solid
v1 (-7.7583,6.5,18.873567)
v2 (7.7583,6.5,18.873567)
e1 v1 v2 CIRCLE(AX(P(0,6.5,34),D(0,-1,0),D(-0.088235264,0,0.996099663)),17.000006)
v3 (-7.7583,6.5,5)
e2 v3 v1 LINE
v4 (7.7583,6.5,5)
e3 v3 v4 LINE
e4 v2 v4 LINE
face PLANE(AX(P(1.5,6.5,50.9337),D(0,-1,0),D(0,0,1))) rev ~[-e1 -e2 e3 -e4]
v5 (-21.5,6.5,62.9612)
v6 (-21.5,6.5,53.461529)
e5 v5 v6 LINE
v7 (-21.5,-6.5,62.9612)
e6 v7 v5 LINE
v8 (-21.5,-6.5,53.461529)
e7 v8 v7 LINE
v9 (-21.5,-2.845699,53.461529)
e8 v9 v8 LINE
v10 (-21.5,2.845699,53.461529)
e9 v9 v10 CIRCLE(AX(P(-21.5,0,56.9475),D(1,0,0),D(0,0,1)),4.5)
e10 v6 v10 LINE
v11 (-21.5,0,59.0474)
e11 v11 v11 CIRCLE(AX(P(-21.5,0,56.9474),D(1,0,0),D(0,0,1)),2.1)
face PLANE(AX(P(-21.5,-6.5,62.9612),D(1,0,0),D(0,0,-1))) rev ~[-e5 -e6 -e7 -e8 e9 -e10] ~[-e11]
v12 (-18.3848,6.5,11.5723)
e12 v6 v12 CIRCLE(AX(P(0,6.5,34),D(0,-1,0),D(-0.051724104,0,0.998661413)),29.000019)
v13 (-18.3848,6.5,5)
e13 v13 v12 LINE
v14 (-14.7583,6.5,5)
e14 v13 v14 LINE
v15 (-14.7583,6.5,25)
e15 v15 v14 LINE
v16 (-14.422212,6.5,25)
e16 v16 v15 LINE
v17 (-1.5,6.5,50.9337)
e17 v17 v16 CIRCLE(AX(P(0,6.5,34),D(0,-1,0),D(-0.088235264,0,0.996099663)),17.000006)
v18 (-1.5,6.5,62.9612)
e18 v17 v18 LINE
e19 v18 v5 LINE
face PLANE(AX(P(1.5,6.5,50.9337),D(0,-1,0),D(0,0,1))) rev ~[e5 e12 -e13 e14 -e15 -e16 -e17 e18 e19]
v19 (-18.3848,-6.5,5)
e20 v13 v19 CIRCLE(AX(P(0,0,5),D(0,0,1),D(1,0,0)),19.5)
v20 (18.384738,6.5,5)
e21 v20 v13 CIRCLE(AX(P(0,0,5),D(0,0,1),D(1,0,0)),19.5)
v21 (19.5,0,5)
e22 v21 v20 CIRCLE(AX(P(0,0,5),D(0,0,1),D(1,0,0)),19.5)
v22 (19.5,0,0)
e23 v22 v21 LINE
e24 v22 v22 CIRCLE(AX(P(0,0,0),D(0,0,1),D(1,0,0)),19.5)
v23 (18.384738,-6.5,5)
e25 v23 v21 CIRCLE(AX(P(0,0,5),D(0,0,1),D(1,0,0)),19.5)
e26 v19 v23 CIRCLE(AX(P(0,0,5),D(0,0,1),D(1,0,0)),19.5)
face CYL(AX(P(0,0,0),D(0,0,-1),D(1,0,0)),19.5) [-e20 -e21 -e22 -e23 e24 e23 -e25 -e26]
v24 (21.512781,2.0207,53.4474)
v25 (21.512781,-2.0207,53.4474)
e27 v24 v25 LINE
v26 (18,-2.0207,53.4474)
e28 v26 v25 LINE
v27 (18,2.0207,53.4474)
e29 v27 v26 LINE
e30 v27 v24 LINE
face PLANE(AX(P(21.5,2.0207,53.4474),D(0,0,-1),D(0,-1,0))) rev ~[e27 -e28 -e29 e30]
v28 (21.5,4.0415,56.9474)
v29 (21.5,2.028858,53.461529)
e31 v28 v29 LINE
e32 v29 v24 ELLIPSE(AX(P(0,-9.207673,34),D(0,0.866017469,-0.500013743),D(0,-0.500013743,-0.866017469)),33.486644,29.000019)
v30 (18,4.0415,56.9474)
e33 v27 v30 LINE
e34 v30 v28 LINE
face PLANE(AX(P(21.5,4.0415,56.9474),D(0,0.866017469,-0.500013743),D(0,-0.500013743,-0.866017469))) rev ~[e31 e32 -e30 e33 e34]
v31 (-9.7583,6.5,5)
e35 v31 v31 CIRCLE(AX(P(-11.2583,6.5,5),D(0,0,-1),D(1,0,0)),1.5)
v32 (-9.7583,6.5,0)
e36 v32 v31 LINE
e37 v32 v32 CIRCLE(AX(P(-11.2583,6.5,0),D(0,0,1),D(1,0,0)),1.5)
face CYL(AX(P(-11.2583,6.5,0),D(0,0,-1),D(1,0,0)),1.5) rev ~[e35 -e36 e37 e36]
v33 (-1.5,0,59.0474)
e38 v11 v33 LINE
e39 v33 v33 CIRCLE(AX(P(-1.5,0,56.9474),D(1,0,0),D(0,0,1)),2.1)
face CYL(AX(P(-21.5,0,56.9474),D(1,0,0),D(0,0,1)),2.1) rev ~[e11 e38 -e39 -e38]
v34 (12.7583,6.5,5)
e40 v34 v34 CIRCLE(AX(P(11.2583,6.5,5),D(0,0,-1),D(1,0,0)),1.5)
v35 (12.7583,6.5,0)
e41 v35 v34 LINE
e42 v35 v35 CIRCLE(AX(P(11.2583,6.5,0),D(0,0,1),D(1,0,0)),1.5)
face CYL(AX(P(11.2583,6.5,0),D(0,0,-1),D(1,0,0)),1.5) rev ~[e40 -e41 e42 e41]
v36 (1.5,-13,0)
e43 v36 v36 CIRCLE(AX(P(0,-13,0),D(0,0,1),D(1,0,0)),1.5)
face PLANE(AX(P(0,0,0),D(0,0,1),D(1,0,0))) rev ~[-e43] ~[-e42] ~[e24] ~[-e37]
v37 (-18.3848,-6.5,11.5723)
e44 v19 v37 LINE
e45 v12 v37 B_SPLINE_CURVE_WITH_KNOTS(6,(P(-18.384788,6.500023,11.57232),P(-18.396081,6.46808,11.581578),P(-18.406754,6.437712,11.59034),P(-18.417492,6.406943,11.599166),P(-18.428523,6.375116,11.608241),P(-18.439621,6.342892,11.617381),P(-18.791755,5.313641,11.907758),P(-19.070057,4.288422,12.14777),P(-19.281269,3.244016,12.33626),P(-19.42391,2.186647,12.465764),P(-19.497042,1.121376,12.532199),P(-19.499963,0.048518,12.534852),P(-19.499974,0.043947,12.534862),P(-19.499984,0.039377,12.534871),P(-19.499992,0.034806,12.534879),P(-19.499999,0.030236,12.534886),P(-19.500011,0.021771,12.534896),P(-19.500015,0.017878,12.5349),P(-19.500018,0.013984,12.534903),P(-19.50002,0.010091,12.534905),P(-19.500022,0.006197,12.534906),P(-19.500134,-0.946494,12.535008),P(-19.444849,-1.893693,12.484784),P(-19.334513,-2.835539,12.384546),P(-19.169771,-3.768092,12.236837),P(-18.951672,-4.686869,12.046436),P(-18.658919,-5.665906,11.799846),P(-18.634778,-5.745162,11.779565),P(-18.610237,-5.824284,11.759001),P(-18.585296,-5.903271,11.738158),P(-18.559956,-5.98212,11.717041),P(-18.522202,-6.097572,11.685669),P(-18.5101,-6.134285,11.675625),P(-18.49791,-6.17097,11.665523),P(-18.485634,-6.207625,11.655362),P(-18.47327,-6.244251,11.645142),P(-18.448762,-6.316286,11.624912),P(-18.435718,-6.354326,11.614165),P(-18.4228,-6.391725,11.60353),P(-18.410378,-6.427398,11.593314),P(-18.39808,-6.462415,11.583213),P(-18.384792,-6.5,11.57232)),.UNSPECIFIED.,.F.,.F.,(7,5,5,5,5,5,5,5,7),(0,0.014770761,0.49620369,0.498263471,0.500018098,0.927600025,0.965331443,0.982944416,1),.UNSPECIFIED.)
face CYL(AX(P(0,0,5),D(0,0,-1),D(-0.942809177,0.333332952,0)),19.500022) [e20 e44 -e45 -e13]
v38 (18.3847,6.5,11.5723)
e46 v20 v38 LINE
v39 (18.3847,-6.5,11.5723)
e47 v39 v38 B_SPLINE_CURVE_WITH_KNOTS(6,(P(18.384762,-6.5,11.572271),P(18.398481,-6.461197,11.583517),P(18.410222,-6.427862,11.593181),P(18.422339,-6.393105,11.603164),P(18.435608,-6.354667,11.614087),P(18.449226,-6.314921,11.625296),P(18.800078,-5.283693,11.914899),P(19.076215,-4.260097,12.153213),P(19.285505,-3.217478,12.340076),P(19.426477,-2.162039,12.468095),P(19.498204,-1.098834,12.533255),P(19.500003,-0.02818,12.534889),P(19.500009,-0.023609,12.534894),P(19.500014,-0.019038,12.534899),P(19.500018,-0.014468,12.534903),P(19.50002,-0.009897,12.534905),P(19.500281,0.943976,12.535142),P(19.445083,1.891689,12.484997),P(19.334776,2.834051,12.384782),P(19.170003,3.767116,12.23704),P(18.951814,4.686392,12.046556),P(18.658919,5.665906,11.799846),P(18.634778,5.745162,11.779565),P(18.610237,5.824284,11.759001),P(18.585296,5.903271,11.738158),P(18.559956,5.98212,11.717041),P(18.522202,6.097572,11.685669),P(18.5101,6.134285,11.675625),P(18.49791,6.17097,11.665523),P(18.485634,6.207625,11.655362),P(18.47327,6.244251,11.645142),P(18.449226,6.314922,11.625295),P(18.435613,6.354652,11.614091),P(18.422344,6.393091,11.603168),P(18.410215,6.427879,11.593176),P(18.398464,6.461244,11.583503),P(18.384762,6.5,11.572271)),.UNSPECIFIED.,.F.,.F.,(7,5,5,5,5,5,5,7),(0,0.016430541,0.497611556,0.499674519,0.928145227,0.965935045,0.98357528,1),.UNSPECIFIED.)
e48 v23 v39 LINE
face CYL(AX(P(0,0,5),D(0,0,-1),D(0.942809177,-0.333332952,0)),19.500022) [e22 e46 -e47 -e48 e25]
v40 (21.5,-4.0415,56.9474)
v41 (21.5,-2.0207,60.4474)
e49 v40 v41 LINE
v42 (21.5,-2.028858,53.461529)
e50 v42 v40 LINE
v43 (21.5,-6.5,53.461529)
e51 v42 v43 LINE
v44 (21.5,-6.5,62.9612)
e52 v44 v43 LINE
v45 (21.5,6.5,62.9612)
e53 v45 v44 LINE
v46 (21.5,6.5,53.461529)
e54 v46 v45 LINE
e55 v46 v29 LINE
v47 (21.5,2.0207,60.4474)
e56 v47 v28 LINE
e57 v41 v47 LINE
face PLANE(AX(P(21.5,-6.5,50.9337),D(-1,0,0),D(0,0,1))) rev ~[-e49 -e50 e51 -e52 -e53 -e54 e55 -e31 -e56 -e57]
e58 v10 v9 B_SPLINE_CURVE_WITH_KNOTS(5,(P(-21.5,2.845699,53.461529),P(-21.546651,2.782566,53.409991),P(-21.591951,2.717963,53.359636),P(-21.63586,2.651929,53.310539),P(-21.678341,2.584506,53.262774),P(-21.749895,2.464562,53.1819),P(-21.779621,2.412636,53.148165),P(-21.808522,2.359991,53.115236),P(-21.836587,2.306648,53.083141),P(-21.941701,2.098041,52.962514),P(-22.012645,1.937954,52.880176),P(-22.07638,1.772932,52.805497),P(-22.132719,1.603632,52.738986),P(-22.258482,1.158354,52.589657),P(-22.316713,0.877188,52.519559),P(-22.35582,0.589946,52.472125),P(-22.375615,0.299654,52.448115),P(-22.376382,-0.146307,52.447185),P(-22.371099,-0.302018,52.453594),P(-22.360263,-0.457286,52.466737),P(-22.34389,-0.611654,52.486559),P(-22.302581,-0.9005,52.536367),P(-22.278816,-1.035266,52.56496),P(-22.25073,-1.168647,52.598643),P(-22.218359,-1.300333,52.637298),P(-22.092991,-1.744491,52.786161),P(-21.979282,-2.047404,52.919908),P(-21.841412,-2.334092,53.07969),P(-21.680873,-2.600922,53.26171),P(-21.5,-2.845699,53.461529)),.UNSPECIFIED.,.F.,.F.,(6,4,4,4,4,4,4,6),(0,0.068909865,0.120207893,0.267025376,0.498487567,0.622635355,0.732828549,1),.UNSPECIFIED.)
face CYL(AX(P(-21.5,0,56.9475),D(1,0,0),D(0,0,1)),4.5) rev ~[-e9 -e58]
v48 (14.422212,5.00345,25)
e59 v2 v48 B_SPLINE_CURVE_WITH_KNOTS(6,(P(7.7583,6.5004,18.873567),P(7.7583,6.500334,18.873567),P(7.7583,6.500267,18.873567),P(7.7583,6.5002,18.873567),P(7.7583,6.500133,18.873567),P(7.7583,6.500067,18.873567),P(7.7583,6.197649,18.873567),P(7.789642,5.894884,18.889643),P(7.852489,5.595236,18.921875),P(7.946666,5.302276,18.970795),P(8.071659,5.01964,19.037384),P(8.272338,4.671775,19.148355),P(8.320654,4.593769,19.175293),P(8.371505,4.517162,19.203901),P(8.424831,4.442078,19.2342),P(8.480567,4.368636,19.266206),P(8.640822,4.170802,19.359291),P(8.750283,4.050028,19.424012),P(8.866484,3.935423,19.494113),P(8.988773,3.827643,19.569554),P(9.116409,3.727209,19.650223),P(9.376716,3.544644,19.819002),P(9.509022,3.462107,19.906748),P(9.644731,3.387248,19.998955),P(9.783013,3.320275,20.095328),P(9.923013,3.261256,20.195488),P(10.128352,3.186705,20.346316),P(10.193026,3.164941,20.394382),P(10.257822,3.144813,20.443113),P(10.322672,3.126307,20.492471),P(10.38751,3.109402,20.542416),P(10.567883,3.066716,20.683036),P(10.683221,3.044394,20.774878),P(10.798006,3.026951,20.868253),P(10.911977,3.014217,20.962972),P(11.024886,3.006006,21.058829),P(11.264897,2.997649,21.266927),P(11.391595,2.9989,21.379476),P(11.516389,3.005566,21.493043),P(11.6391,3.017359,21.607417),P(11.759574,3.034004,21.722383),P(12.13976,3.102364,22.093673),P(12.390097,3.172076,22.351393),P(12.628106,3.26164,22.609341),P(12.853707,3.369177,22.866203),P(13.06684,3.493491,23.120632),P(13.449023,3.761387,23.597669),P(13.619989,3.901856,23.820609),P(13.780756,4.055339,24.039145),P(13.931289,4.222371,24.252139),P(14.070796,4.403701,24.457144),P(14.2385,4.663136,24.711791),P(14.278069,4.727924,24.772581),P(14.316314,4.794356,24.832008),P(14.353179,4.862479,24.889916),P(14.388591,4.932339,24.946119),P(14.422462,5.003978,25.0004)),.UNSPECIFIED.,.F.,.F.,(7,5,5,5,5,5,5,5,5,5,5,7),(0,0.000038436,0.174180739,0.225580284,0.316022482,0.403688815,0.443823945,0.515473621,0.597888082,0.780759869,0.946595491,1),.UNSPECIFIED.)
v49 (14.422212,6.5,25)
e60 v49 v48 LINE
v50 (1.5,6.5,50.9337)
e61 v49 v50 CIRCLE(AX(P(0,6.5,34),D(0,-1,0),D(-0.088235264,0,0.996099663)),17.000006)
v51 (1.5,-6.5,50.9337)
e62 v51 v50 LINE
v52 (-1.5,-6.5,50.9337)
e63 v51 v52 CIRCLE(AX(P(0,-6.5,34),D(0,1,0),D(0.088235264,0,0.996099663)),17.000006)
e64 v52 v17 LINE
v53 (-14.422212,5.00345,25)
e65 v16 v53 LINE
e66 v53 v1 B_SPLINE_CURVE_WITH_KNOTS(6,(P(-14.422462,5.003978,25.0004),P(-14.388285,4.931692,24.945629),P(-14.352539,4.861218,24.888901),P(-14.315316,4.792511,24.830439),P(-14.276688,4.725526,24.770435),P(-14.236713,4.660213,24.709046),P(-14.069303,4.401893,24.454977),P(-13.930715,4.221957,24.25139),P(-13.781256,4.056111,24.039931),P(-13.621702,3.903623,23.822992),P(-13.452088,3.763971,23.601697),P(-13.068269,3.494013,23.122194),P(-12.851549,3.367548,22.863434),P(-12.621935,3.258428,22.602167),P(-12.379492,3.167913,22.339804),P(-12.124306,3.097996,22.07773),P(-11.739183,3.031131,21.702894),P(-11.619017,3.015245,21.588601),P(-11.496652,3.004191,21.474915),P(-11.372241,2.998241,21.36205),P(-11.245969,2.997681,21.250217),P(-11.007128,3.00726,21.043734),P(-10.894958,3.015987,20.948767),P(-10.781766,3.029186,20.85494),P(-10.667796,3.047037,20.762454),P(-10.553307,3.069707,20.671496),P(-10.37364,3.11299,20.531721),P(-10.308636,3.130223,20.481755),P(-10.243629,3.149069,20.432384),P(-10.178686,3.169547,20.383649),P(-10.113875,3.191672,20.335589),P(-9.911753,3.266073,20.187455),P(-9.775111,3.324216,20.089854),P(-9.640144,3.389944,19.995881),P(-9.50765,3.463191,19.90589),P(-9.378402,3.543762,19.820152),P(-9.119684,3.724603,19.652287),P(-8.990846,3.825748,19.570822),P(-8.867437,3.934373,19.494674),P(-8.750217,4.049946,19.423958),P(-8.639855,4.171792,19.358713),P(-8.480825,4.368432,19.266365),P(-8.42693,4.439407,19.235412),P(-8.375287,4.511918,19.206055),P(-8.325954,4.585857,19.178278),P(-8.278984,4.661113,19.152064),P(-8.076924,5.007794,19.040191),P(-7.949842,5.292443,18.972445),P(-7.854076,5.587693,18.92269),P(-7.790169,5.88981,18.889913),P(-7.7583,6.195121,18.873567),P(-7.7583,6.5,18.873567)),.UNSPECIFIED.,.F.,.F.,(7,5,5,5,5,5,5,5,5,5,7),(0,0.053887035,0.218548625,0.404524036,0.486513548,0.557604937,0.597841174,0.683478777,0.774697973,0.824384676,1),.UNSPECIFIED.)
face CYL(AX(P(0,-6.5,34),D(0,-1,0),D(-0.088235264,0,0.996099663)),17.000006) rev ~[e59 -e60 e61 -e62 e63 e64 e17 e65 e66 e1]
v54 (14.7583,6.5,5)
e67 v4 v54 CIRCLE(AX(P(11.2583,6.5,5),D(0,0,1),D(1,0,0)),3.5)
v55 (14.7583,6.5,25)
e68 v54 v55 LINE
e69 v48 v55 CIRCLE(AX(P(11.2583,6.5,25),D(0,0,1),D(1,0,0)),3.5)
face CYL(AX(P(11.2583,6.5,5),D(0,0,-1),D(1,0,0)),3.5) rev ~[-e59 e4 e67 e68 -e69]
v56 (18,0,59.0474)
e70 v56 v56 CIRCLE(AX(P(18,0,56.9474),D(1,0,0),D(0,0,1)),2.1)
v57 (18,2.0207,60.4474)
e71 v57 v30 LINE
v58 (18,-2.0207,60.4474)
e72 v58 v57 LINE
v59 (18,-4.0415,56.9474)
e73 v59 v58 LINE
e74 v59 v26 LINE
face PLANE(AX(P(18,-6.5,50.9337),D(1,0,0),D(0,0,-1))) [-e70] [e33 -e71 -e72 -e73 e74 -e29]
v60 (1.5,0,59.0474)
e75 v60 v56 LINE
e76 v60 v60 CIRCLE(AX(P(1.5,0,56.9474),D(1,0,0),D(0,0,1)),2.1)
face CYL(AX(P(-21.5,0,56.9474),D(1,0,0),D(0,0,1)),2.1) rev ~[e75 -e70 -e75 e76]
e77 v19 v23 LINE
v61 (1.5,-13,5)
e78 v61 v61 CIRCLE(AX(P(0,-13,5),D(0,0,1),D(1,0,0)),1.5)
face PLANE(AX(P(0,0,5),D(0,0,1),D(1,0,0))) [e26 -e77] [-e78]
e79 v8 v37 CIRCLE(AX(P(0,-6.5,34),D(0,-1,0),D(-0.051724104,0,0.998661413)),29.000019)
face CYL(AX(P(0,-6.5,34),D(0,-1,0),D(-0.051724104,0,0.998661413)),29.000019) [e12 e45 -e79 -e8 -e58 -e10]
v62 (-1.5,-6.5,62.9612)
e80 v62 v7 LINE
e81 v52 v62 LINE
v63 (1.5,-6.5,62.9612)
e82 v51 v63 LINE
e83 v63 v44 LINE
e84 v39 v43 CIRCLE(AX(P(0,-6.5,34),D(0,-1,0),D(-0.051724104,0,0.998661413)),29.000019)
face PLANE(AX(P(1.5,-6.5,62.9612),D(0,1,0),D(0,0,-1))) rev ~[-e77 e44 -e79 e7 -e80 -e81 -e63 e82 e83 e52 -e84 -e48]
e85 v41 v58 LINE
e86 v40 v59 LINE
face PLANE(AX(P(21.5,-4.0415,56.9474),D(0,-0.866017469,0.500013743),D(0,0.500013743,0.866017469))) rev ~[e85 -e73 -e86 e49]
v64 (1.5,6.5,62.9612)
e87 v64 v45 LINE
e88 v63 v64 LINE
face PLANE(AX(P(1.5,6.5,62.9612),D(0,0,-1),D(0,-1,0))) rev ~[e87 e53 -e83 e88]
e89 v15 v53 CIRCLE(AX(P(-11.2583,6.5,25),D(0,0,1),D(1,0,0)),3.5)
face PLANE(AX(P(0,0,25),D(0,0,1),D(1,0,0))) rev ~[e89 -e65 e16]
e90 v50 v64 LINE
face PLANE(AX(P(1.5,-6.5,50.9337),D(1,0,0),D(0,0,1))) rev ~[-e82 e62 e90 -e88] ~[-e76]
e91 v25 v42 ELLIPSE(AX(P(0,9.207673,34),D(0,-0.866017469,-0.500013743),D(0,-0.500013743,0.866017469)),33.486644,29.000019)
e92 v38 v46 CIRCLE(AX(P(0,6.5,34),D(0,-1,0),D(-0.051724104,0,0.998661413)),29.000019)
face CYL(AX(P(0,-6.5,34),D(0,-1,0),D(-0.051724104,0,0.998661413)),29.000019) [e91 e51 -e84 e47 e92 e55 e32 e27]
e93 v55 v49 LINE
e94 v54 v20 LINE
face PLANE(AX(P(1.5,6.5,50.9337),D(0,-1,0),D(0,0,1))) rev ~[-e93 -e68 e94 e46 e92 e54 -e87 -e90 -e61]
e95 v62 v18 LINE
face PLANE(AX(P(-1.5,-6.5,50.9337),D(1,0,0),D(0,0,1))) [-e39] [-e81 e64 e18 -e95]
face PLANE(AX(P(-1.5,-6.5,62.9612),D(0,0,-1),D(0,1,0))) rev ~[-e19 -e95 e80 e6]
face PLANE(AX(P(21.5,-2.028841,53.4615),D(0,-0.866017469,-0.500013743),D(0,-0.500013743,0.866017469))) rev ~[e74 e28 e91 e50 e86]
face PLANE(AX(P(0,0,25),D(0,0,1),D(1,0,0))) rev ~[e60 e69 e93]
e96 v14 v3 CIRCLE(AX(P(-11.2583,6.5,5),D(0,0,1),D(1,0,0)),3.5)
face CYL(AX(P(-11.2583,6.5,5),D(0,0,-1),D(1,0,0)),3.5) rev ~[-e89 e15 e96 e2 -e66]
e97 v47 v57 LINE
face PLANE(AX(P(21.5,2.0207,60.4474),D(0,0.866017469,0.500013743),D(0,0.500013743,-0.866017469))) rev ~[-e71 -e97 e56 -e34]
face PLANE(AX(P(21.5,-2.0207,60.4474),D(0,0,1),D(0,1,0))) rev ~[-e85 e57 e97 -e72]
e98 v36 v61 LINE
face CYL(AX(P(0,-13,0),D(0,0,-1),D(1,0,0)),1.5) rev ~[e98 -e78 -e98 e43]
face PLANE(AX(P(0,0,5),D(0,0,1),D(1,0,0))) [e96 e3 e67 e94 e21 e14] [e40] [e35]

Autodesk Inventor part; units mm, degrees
ref_plane "YZ Plane" through (0, 0, 0) normal (1, 0, 0) x (0, 1, 0)
ref_plane "XZ Plane" through (0, 0, 0) normal (0, 1, 0) x (-1, 0, 0)
ref_plane "XY Plane" through (0, 0, 0) normal (0, 0, 1) x (1, 0, 0)
sketch "Skizze1" plane through (0, 0, 0) normal (0, 0, 1) x (1, 0, 0)
  circle A0 centre (-11.2583, 6.5) radius 1.5 projected
  circle A1 centre (-11.2583, -6.5) radius 1.5 projected
  circle A2 centre (0, -13) radius 1.5 projected
  circle A3 centre (11.2583, -6.5) radius 1.5 projected
  circle A4 centre (11.2583, 6.5) radius 1.5 projected
  circle A5 centre (0, 13) radius 1.5 projected
  arc A6 (14.3761, 1.8914) -> (11.9393, 3.5783) centre (12.3932, 1.6305) ccw projected
  arc A7 (14.3761, -1.8914) -> (14.3761, 1.8914) centre (0, 0) ccw projected
  arc A8 (11.9393, -3.5783) -> (14.3761, -1.8914) centre (12.3932, -1.6305) ccw projected
  arc A9 (11.9393, -3.5783) -> (9.0685, -8.5505) centre (11.2583, -6.5) ccw projected
  arc A10 (8.826, -11.5044) -> (9.0685, -8.5505) centre (7.6087, -9.9176) ccw projected
  arc A11 (5.5501, -13.3958) -> (8.826, -11.5044) centre (0, 0) ccw projected
  arc A12 (2.8707, -12.1288) -> (5.5501, -13.3958) centre (4.7846, -11.5481) ccw projected
  arc A13 (2.8707, -12.1288) -> (-2.8707, -12.1288) centre (0, -13) ccw projected
  arc A14 (-5.5501, -13.3958) -> (-2.8707, -12.1288) centre (-4.7846, -11.5481) ccw projected
  arc A15 (-8.826, -11.5044) -> (-5.5501, -13.3958) centre (0, 0) ccw projected
  arc A16 (-9.0685, -8.5505) -> (-8.826, -11.5044) centre (-7.6087, -9.9176) ccw projected
  arc A17 (-9.0685, -8.5505) -> (-11.9393, -3.5783) centre (-11.2583, -6.5) ccw projected
  arc A18 (-14.3761, -1.8914) -> (-11.9393, -3.5783) centre (-12.3932, -1.6305) ccw projected
  arc A19 (-14.3761, 1.8914) -> (-14.3761, -1.8914) centre (0, 0) ccw projected
  arc A20 (-11.9393, 3.5783) -> (-14.3761, 1.8914) centre (-12.3932, 1.6305) ccw projected
  arc A21 (-11.9393, 3.5783) -> (-9.0685, 8.5505) centre (-11.2583, 6.5) ccw projected
  arc A22 (-8.826, 11.5044) -> (-9.0685, 8.5505) centre (-7.6087, 9.9176) ccw projected
  arc A23 (-5.5501, 13.3958) -> (-8.826, 11.5044) centre (0, 0) ccw projected
  arc A24 (-2.8707, 12.1288) -> (-5.5501, 13.3958) centre (-4.7846, 11.5481) ccw projected
  arc A25 (-2.8707, 12.1288) -> (2.8707, 12.1288) centre (0, 13) ccw projected
  arc A26 (5.5501, 13.3958) -> (2.8707, 12.1288) centre (4.7846, 11.5481) ccw projected
  arc A27 (8.826, 11.5044) -> (5.5501, 13.3958) centre (0, 0) ccw projected
  arc A28 (9.0685, 8.5505) -> (8.826, 11.5044) centre (7.6087, 9.9176) ccw projected
  arc A29 (9.0685, 8.5505) -> (11.9393, 3.5783) centre (11.2583, 6.5) ccw projected
  circle A30 centre (0, 0) radius 17.5 projected
  circle A31 centre (0, 0) radius 19.5
  point P0 (0, 0)
  dimension "d0" = 39
extrude "Extrusion1" add sketch "Skizze1" along normal blind 5 contours A7 A8 A9 A10 A11 A12 A13 A14 A15 A16 A17 A18 A19 A20 A21 A22 A23 A24 A25 A26 A27 A28 A29 A6 | A30 | A31
ref_plane "Arbeitsebene1" through (11.2583, -6.5, 0) normal (0, -1, 0) x (0, 0, 1)
sketch "Skizze7" plane through (11.2583, -6.5, 0) normal (0, -1, 0) x (0, 0, 1)
  line L0 (0, 21.0167) -> (5, 21.0167) projected
  line L1 (5, 21.0167) -> (5, 1.5) projected
  line L2 (5, 1.5) -> (0, 1.5) projected
  line L3 (0, 1.5) -> (0, 21.0167) projected
  line L4 (5, -7.1264) -> (0, -7.1264) projected
  line L5 (0, -7.1264) -> (0, -1.5) projected
  line L6 (0, -1.5) -> (5, -1.5) projected
  line L7 (5, -1.5) -> (5, -7.1264) projected
  line L8 (0, 29.6431) -> (5, 29.6431) projected
  line L9 (5, 29.6431) -> (5, 24.0167) projected
  line L10 (5, 24.0167) -> (0, 24.0167) projected
  line L11 (0, 24.0167) -> (0, 29.6431) projected
  line L12 (5, 1.5) -> (17, 1.5)
  line L13 (17, 1.5) -> (17, 21.0167)
  line L14 (17, 21.0167) -> (5, 21.0167)
  line L15 (5, 21.0167) -> (5, 1.5)
  arc A0 (50.9337, 12.7583) -> (50.9337, 9.7583) centre (34, 11.2583) ccw
  arc A1 (62.9612, 12.7583) -> (62.9612, 9.7583) centre (34, 11.2583) ccw
  line L16 (50.9337, 9.7583) -> (62.9612, 9.7583)
  line L17 (50.9337, 12.7583) -> (62.9612, 12.7583)
  line L18 (34, 11.2583) -> (5, 11.2583) construction
  line L19 (5, -7.1264) -> (11.5723, -7.1264)
  line L20 (5, 29.6431) -> (11.5723, 29.6431)
  line L21 (5, -7.1264) -> (5, 29.6431)
  point P0 (0, 11.2583)
  dimension "d26" = 3
  dimension "d27" = 17
  dimension "d28" = 12
extrude "Extrusion6" add sketch "Skizze7" against normal blind 13 contours L14 A1 L1 | L21 L9 L20 A1 L14 | A1 L12 L1 | A1 L14 L13 L12 | A1 L17 A0 L13 L14 | L12 A1 L19 L7 L21 | L12 L13 A0 L16 A1
sketch "Skizze8" plane through (1.5, -6.5, 50.9337) normal (-1, 0, 0) x (0, 0, 1)
  line L0 (12.0275, 0) -> (0, 0) projected
  line L1 (0, 0) -> (0, 13) projected
  line L2 (0, 13) -> (12.0275, 13) projected
  line L3 (12.0275, 13) -> (12.0275, 0) projected
  line L4 (-45.9337, 25.9422) -> (-45.9337, 19.5) projected
  line L5 (-45.9337, 19.5) -> (-45.9337, 13) projected
  line L6 (-45.9337, 13) -> (-33.8674, 13) projected
  line L7 (-33.8674, 13) -> (-33.8674, 0) projected
  line L8 (-33.8674, 0) -> (-45.9337, 0) projected
  line L9 (-45.9337, 0) -> (-45.9337, -6.5) projected
  line L10 (-45.9337, -6.5) -> (-50.9337, -6.5) projected
  line L11 (-50.9337, -6.5) -> (-50.9337, 19.5) projected
  line L12 (-50.9337, 19.5) -> (-50.9337, 25.9422) projected
  line L13 (-50.9337, 25.9422) -> (-45.9337, 25.9422) projected
  line L14 (-45.9337, 19.5) -> (-50.9337, 19.5) projected
  line L15 (-45.9337, -6.5) -> (-45.9337, -12.9422) projected
  line L16 (-45.9337, -12.9422) -> (-50.9337, -12.9422) projected
  line L17 (-50.9337, -12.9422) -> (-50.9337, -6.5) projected
  point P0 (-50.9337, 6.5)
extrude "Extrusion7" add sketch "Skizze8" against normal blind 20 contours L0 L1 L2 L3
sketch "Skizze9" plane through (-1.5, -6.5, 62.9612) normal (1, 0, 0) x (0, 0, -1)
  line L0 (12.0275, 0) -> (0, 0) projected
  line L1 (0, 0) -> (0, 13) projected
  line L2 (0, 13) -> (12.0275, 13) projected
  line L3 (12.0275, 13) -> (12.0275, 0) projected
  line L4 (57.9612, -12.9422) -> (57.9612, -6.5) projected
  line L5 (57.9612, -6.5) -> (57.9612, 0) projected
  line L6 (57.9612, 0) -> (45.8949, 0) projected
  line L7 (45.8949, 0) -> (45.8949, 13) projected
  line L8 (45.8949, 13) -> (57.9612, 13) projected
  line L9 (57.9612, 13) -> (57.9612, 19.5) projected
  line L10 (57.9612, 19.5) -> (62.9612, 19.5) projected
  line L11 (62.9612, 19.5) -> (62.9612, -6.5) projected
  line L12 (62.9612, -6.5) -> (62.9612, -12.9422) projected
  line L13 (62.9612, -12.9422) -> (57.9612, -12.9422) projected
  line L14 (57.9612, -6.5) -> (62.9612, -6.5) projected
  line L15 (57.9612, 19.5) -> (57.9612, 25.9422) projected
  line L16 (57.9612, 25.9422) -> (62.9612, 25.9422) projected
  line L17 (62.9612, 25.9422) -> (62.9612, 19.5) projected
  point P0 (62.9612, 6.5)
extrude "Extrusion8" add sketch "Skizze9" against normal blind 20 contours L0 L1 L2 L3
sketch "Skizze10" plane through (0, 0, 5) normal (0, 0, 1) x (1, 0, 0)
  circle A0 centre (0, 13) radius 1.5 projected
  circle A1 centre (11.2583, 6.5) radius 1.5 projected
  circle A2 centre (11.2583, -6.5) radius 1.5 projected
  circle A3 centre (0, -13) radius 1.5 projected
  circle A4 centre (-11.2583, -6.5) radius 1.5 projected
  circle A5 centre (-11.2583, 6.5) radius 1.5 projected
  circle A6 centre (0, 0) radius 19.5 projected
  circle A7 centre (11.2583, 6.5) radius 3.5
  circle A8 centre (-11.2583, 6.5) radius 3.5
  line L0 (12.7583, 6.5) -> (9.7583, 6.5) projected
  point P0 (0, 0)
  dimension "d35" = 7
extrude "Extrusion9" cut sketch "Skizze10" along normal blind 20 contours L0 A1 | A1 L0 | A5 | A7 | A8
sketch "Skizze11" plane through (0, 0, 0) normal (0, 0, -1) x (-1, 0, 0)
  circle A0 centre (0, 13) radius 1.5 projected
  circle A1 centre (-11.2583, 6.5) radius 1.5 projected
  circle A2 centre (-11.2583, -6.5) radius 1.5 projected
  circle A3 centre (0, -13) radius 1.5 projected
  circle A4 centre (11.2583, -6.5) radius 1.5 projected
  circle A5 centre (11.2583, 6.5) radius 1.5 projected
  circle A6 centre (0, 0) radius 19.5 projected
  point P0 (0, 0)
extrude "Extrusion10" add sketch "Skizze11" against normal up to surface (5 mm away) contours A0 | A2 | A4
sketch "Skizze13" plane through (-21.5, -6.5, 62.9612) normal (-1, 0, 0) x (0, 0, 1)
  line L0 (-12.0275, 0) -> (0, 0) projected
  line L1 (-12.0275, 0) -> (-12.0275, 13) projected
  line L2 (0, 13) -> (-12.0275, 13) projected
  line L3 (0, 0) -> (0, 13) projected
  line L4 (-12.0275, 0) -> (0, 0)
  line L5 (0, 0) -> (0, 13)
  line L6 (0, 13) -> (-12.0275, 13)
  line L7 (-12.0275, 13) -> (-12.0275, 0)
  line L8 (-12.0275, 0) -> (0, 13) construction
  line L9 (0, 0) -> (-12.0275, 13) construction
  point P0 (-62.9612, 6.5)
  point P1 (-6.0137, 6.5)
hole "Bohrung2" at (-21.5, 0, 56.9474) direction (1, 0, 0) diameter 4.2 end through all
sketch "Skizze14" plane through (-21.5, -6.5, 62.9612) normal (-1, 0, 0) x (0, 0, 1)
  circle A0 centre (-6.0137, 6.5) radius 2.1 projected
  line L0 (-9.4997, 0) -> (-9.4997, 13) projected
  line L1 (-9.4997, 0) -> (0, 0) projected
  line L2 (0, 0) -> (0, 13) projected
  line L3 (0, 13) -> (-9.4997, 13) projected
  circle A1 centre (-6.0137, 6.5) radius 4.5
  point P0 (-62.9612, 6.5)
  dimension "d47" = 9
extrude "Extrusion11" cut sketch "Skizze14" along normal blind 2 contours A0 | A1 L0 | L0 A1
sketch "Skizze15" plane through (21.5, -6.5, 50.9337) normal (1, 0, 0) x (0, 0, -1)
  circle A0 centre (-6.0137, 6.5) radius 2.1 projected
  line L0 (-2.5278, 13) -> (-2.5278, 0) projected
  line L1 (-2.5278, 13) -> (-12.0275, 13) projected
  line L2 (-12.0275, 13) -> (-12.0275, 0) projected
  line L3 (-12.0275, 0) -> (-2.5278, 0) projected
  line L4 (-6.0137, 10.5415) -> (-2.5137, 8.5207)
  line L5 (-2.5137, 8.5207) -> (-2.5137, 4.4793)
  line L6 (-2.5137, 4.4793) -> (-6.0137, 2.4585)
  line L7 (-6.0137, 2.4585) -> (-9.5137, 4.4793)
  line L8 (-9.5137, 4.4793) -> (-9.5137, 8.5207)
  line L9 (-9.5137, 8.5207) -> (-6.0137, 10.5415)
  line L10 (-12.0275, 13) -> (-12.0275, 0) projected
  point P0 (50.9337, 6.5)
  dimension "d50" = 7
extrude "Extrusion12" cut sketch "Skizze15" along normal mid plane 7 contours A0 | L4 L5 L6 L0 | L0 L6 L7 L8 L9 L4
sketch "Skizze16" plane through (0, 0, 5) normal (0, 0, 1) x (1, 0, 0)
  line L0 (-18.3848, -6.5) -> (-18.3848, 6.5) projected
  arc A0 (-18.3848, 6.5) -> (-18.3848, -6.5) centre (0, 0) ccw projected
  line L1 (18.3848, 6.5) -> (18.3848, -6.5) projected
  arc A1 (18.3848, -6.5) -> (18.3848, 6.5) centre (0, 0) ccw projected
  point P0 (0, 0)
extrude "Extrusion13" add sketch "Skizze16" along normal blind 10
sketch "Skizze2" plane through (0, 0, 5) normal (0, 0, 1) x (1, 0, 0)
  circle A0 centre (0, 0) radius 7.5
  dimension "d3" = 15
  dimension "d20" = 7
  dimension "d8" = 7
sketch "Skizze4" plane through (0, 0, 10) normal (0, 0, 1) x (1, 0, 0)
  point P0 (0, 0)
sketch "Skizze5" plane through (0, 0, 3) normal (0, 0, -1) x (-1, 0, 0)
  circle A0 centre (0, 0) radius 2 projected
  circle A1 centre (0, 0) radius 2 projected
properties part number "GripperMountProxxon" material "ABS-Kunststoff"
